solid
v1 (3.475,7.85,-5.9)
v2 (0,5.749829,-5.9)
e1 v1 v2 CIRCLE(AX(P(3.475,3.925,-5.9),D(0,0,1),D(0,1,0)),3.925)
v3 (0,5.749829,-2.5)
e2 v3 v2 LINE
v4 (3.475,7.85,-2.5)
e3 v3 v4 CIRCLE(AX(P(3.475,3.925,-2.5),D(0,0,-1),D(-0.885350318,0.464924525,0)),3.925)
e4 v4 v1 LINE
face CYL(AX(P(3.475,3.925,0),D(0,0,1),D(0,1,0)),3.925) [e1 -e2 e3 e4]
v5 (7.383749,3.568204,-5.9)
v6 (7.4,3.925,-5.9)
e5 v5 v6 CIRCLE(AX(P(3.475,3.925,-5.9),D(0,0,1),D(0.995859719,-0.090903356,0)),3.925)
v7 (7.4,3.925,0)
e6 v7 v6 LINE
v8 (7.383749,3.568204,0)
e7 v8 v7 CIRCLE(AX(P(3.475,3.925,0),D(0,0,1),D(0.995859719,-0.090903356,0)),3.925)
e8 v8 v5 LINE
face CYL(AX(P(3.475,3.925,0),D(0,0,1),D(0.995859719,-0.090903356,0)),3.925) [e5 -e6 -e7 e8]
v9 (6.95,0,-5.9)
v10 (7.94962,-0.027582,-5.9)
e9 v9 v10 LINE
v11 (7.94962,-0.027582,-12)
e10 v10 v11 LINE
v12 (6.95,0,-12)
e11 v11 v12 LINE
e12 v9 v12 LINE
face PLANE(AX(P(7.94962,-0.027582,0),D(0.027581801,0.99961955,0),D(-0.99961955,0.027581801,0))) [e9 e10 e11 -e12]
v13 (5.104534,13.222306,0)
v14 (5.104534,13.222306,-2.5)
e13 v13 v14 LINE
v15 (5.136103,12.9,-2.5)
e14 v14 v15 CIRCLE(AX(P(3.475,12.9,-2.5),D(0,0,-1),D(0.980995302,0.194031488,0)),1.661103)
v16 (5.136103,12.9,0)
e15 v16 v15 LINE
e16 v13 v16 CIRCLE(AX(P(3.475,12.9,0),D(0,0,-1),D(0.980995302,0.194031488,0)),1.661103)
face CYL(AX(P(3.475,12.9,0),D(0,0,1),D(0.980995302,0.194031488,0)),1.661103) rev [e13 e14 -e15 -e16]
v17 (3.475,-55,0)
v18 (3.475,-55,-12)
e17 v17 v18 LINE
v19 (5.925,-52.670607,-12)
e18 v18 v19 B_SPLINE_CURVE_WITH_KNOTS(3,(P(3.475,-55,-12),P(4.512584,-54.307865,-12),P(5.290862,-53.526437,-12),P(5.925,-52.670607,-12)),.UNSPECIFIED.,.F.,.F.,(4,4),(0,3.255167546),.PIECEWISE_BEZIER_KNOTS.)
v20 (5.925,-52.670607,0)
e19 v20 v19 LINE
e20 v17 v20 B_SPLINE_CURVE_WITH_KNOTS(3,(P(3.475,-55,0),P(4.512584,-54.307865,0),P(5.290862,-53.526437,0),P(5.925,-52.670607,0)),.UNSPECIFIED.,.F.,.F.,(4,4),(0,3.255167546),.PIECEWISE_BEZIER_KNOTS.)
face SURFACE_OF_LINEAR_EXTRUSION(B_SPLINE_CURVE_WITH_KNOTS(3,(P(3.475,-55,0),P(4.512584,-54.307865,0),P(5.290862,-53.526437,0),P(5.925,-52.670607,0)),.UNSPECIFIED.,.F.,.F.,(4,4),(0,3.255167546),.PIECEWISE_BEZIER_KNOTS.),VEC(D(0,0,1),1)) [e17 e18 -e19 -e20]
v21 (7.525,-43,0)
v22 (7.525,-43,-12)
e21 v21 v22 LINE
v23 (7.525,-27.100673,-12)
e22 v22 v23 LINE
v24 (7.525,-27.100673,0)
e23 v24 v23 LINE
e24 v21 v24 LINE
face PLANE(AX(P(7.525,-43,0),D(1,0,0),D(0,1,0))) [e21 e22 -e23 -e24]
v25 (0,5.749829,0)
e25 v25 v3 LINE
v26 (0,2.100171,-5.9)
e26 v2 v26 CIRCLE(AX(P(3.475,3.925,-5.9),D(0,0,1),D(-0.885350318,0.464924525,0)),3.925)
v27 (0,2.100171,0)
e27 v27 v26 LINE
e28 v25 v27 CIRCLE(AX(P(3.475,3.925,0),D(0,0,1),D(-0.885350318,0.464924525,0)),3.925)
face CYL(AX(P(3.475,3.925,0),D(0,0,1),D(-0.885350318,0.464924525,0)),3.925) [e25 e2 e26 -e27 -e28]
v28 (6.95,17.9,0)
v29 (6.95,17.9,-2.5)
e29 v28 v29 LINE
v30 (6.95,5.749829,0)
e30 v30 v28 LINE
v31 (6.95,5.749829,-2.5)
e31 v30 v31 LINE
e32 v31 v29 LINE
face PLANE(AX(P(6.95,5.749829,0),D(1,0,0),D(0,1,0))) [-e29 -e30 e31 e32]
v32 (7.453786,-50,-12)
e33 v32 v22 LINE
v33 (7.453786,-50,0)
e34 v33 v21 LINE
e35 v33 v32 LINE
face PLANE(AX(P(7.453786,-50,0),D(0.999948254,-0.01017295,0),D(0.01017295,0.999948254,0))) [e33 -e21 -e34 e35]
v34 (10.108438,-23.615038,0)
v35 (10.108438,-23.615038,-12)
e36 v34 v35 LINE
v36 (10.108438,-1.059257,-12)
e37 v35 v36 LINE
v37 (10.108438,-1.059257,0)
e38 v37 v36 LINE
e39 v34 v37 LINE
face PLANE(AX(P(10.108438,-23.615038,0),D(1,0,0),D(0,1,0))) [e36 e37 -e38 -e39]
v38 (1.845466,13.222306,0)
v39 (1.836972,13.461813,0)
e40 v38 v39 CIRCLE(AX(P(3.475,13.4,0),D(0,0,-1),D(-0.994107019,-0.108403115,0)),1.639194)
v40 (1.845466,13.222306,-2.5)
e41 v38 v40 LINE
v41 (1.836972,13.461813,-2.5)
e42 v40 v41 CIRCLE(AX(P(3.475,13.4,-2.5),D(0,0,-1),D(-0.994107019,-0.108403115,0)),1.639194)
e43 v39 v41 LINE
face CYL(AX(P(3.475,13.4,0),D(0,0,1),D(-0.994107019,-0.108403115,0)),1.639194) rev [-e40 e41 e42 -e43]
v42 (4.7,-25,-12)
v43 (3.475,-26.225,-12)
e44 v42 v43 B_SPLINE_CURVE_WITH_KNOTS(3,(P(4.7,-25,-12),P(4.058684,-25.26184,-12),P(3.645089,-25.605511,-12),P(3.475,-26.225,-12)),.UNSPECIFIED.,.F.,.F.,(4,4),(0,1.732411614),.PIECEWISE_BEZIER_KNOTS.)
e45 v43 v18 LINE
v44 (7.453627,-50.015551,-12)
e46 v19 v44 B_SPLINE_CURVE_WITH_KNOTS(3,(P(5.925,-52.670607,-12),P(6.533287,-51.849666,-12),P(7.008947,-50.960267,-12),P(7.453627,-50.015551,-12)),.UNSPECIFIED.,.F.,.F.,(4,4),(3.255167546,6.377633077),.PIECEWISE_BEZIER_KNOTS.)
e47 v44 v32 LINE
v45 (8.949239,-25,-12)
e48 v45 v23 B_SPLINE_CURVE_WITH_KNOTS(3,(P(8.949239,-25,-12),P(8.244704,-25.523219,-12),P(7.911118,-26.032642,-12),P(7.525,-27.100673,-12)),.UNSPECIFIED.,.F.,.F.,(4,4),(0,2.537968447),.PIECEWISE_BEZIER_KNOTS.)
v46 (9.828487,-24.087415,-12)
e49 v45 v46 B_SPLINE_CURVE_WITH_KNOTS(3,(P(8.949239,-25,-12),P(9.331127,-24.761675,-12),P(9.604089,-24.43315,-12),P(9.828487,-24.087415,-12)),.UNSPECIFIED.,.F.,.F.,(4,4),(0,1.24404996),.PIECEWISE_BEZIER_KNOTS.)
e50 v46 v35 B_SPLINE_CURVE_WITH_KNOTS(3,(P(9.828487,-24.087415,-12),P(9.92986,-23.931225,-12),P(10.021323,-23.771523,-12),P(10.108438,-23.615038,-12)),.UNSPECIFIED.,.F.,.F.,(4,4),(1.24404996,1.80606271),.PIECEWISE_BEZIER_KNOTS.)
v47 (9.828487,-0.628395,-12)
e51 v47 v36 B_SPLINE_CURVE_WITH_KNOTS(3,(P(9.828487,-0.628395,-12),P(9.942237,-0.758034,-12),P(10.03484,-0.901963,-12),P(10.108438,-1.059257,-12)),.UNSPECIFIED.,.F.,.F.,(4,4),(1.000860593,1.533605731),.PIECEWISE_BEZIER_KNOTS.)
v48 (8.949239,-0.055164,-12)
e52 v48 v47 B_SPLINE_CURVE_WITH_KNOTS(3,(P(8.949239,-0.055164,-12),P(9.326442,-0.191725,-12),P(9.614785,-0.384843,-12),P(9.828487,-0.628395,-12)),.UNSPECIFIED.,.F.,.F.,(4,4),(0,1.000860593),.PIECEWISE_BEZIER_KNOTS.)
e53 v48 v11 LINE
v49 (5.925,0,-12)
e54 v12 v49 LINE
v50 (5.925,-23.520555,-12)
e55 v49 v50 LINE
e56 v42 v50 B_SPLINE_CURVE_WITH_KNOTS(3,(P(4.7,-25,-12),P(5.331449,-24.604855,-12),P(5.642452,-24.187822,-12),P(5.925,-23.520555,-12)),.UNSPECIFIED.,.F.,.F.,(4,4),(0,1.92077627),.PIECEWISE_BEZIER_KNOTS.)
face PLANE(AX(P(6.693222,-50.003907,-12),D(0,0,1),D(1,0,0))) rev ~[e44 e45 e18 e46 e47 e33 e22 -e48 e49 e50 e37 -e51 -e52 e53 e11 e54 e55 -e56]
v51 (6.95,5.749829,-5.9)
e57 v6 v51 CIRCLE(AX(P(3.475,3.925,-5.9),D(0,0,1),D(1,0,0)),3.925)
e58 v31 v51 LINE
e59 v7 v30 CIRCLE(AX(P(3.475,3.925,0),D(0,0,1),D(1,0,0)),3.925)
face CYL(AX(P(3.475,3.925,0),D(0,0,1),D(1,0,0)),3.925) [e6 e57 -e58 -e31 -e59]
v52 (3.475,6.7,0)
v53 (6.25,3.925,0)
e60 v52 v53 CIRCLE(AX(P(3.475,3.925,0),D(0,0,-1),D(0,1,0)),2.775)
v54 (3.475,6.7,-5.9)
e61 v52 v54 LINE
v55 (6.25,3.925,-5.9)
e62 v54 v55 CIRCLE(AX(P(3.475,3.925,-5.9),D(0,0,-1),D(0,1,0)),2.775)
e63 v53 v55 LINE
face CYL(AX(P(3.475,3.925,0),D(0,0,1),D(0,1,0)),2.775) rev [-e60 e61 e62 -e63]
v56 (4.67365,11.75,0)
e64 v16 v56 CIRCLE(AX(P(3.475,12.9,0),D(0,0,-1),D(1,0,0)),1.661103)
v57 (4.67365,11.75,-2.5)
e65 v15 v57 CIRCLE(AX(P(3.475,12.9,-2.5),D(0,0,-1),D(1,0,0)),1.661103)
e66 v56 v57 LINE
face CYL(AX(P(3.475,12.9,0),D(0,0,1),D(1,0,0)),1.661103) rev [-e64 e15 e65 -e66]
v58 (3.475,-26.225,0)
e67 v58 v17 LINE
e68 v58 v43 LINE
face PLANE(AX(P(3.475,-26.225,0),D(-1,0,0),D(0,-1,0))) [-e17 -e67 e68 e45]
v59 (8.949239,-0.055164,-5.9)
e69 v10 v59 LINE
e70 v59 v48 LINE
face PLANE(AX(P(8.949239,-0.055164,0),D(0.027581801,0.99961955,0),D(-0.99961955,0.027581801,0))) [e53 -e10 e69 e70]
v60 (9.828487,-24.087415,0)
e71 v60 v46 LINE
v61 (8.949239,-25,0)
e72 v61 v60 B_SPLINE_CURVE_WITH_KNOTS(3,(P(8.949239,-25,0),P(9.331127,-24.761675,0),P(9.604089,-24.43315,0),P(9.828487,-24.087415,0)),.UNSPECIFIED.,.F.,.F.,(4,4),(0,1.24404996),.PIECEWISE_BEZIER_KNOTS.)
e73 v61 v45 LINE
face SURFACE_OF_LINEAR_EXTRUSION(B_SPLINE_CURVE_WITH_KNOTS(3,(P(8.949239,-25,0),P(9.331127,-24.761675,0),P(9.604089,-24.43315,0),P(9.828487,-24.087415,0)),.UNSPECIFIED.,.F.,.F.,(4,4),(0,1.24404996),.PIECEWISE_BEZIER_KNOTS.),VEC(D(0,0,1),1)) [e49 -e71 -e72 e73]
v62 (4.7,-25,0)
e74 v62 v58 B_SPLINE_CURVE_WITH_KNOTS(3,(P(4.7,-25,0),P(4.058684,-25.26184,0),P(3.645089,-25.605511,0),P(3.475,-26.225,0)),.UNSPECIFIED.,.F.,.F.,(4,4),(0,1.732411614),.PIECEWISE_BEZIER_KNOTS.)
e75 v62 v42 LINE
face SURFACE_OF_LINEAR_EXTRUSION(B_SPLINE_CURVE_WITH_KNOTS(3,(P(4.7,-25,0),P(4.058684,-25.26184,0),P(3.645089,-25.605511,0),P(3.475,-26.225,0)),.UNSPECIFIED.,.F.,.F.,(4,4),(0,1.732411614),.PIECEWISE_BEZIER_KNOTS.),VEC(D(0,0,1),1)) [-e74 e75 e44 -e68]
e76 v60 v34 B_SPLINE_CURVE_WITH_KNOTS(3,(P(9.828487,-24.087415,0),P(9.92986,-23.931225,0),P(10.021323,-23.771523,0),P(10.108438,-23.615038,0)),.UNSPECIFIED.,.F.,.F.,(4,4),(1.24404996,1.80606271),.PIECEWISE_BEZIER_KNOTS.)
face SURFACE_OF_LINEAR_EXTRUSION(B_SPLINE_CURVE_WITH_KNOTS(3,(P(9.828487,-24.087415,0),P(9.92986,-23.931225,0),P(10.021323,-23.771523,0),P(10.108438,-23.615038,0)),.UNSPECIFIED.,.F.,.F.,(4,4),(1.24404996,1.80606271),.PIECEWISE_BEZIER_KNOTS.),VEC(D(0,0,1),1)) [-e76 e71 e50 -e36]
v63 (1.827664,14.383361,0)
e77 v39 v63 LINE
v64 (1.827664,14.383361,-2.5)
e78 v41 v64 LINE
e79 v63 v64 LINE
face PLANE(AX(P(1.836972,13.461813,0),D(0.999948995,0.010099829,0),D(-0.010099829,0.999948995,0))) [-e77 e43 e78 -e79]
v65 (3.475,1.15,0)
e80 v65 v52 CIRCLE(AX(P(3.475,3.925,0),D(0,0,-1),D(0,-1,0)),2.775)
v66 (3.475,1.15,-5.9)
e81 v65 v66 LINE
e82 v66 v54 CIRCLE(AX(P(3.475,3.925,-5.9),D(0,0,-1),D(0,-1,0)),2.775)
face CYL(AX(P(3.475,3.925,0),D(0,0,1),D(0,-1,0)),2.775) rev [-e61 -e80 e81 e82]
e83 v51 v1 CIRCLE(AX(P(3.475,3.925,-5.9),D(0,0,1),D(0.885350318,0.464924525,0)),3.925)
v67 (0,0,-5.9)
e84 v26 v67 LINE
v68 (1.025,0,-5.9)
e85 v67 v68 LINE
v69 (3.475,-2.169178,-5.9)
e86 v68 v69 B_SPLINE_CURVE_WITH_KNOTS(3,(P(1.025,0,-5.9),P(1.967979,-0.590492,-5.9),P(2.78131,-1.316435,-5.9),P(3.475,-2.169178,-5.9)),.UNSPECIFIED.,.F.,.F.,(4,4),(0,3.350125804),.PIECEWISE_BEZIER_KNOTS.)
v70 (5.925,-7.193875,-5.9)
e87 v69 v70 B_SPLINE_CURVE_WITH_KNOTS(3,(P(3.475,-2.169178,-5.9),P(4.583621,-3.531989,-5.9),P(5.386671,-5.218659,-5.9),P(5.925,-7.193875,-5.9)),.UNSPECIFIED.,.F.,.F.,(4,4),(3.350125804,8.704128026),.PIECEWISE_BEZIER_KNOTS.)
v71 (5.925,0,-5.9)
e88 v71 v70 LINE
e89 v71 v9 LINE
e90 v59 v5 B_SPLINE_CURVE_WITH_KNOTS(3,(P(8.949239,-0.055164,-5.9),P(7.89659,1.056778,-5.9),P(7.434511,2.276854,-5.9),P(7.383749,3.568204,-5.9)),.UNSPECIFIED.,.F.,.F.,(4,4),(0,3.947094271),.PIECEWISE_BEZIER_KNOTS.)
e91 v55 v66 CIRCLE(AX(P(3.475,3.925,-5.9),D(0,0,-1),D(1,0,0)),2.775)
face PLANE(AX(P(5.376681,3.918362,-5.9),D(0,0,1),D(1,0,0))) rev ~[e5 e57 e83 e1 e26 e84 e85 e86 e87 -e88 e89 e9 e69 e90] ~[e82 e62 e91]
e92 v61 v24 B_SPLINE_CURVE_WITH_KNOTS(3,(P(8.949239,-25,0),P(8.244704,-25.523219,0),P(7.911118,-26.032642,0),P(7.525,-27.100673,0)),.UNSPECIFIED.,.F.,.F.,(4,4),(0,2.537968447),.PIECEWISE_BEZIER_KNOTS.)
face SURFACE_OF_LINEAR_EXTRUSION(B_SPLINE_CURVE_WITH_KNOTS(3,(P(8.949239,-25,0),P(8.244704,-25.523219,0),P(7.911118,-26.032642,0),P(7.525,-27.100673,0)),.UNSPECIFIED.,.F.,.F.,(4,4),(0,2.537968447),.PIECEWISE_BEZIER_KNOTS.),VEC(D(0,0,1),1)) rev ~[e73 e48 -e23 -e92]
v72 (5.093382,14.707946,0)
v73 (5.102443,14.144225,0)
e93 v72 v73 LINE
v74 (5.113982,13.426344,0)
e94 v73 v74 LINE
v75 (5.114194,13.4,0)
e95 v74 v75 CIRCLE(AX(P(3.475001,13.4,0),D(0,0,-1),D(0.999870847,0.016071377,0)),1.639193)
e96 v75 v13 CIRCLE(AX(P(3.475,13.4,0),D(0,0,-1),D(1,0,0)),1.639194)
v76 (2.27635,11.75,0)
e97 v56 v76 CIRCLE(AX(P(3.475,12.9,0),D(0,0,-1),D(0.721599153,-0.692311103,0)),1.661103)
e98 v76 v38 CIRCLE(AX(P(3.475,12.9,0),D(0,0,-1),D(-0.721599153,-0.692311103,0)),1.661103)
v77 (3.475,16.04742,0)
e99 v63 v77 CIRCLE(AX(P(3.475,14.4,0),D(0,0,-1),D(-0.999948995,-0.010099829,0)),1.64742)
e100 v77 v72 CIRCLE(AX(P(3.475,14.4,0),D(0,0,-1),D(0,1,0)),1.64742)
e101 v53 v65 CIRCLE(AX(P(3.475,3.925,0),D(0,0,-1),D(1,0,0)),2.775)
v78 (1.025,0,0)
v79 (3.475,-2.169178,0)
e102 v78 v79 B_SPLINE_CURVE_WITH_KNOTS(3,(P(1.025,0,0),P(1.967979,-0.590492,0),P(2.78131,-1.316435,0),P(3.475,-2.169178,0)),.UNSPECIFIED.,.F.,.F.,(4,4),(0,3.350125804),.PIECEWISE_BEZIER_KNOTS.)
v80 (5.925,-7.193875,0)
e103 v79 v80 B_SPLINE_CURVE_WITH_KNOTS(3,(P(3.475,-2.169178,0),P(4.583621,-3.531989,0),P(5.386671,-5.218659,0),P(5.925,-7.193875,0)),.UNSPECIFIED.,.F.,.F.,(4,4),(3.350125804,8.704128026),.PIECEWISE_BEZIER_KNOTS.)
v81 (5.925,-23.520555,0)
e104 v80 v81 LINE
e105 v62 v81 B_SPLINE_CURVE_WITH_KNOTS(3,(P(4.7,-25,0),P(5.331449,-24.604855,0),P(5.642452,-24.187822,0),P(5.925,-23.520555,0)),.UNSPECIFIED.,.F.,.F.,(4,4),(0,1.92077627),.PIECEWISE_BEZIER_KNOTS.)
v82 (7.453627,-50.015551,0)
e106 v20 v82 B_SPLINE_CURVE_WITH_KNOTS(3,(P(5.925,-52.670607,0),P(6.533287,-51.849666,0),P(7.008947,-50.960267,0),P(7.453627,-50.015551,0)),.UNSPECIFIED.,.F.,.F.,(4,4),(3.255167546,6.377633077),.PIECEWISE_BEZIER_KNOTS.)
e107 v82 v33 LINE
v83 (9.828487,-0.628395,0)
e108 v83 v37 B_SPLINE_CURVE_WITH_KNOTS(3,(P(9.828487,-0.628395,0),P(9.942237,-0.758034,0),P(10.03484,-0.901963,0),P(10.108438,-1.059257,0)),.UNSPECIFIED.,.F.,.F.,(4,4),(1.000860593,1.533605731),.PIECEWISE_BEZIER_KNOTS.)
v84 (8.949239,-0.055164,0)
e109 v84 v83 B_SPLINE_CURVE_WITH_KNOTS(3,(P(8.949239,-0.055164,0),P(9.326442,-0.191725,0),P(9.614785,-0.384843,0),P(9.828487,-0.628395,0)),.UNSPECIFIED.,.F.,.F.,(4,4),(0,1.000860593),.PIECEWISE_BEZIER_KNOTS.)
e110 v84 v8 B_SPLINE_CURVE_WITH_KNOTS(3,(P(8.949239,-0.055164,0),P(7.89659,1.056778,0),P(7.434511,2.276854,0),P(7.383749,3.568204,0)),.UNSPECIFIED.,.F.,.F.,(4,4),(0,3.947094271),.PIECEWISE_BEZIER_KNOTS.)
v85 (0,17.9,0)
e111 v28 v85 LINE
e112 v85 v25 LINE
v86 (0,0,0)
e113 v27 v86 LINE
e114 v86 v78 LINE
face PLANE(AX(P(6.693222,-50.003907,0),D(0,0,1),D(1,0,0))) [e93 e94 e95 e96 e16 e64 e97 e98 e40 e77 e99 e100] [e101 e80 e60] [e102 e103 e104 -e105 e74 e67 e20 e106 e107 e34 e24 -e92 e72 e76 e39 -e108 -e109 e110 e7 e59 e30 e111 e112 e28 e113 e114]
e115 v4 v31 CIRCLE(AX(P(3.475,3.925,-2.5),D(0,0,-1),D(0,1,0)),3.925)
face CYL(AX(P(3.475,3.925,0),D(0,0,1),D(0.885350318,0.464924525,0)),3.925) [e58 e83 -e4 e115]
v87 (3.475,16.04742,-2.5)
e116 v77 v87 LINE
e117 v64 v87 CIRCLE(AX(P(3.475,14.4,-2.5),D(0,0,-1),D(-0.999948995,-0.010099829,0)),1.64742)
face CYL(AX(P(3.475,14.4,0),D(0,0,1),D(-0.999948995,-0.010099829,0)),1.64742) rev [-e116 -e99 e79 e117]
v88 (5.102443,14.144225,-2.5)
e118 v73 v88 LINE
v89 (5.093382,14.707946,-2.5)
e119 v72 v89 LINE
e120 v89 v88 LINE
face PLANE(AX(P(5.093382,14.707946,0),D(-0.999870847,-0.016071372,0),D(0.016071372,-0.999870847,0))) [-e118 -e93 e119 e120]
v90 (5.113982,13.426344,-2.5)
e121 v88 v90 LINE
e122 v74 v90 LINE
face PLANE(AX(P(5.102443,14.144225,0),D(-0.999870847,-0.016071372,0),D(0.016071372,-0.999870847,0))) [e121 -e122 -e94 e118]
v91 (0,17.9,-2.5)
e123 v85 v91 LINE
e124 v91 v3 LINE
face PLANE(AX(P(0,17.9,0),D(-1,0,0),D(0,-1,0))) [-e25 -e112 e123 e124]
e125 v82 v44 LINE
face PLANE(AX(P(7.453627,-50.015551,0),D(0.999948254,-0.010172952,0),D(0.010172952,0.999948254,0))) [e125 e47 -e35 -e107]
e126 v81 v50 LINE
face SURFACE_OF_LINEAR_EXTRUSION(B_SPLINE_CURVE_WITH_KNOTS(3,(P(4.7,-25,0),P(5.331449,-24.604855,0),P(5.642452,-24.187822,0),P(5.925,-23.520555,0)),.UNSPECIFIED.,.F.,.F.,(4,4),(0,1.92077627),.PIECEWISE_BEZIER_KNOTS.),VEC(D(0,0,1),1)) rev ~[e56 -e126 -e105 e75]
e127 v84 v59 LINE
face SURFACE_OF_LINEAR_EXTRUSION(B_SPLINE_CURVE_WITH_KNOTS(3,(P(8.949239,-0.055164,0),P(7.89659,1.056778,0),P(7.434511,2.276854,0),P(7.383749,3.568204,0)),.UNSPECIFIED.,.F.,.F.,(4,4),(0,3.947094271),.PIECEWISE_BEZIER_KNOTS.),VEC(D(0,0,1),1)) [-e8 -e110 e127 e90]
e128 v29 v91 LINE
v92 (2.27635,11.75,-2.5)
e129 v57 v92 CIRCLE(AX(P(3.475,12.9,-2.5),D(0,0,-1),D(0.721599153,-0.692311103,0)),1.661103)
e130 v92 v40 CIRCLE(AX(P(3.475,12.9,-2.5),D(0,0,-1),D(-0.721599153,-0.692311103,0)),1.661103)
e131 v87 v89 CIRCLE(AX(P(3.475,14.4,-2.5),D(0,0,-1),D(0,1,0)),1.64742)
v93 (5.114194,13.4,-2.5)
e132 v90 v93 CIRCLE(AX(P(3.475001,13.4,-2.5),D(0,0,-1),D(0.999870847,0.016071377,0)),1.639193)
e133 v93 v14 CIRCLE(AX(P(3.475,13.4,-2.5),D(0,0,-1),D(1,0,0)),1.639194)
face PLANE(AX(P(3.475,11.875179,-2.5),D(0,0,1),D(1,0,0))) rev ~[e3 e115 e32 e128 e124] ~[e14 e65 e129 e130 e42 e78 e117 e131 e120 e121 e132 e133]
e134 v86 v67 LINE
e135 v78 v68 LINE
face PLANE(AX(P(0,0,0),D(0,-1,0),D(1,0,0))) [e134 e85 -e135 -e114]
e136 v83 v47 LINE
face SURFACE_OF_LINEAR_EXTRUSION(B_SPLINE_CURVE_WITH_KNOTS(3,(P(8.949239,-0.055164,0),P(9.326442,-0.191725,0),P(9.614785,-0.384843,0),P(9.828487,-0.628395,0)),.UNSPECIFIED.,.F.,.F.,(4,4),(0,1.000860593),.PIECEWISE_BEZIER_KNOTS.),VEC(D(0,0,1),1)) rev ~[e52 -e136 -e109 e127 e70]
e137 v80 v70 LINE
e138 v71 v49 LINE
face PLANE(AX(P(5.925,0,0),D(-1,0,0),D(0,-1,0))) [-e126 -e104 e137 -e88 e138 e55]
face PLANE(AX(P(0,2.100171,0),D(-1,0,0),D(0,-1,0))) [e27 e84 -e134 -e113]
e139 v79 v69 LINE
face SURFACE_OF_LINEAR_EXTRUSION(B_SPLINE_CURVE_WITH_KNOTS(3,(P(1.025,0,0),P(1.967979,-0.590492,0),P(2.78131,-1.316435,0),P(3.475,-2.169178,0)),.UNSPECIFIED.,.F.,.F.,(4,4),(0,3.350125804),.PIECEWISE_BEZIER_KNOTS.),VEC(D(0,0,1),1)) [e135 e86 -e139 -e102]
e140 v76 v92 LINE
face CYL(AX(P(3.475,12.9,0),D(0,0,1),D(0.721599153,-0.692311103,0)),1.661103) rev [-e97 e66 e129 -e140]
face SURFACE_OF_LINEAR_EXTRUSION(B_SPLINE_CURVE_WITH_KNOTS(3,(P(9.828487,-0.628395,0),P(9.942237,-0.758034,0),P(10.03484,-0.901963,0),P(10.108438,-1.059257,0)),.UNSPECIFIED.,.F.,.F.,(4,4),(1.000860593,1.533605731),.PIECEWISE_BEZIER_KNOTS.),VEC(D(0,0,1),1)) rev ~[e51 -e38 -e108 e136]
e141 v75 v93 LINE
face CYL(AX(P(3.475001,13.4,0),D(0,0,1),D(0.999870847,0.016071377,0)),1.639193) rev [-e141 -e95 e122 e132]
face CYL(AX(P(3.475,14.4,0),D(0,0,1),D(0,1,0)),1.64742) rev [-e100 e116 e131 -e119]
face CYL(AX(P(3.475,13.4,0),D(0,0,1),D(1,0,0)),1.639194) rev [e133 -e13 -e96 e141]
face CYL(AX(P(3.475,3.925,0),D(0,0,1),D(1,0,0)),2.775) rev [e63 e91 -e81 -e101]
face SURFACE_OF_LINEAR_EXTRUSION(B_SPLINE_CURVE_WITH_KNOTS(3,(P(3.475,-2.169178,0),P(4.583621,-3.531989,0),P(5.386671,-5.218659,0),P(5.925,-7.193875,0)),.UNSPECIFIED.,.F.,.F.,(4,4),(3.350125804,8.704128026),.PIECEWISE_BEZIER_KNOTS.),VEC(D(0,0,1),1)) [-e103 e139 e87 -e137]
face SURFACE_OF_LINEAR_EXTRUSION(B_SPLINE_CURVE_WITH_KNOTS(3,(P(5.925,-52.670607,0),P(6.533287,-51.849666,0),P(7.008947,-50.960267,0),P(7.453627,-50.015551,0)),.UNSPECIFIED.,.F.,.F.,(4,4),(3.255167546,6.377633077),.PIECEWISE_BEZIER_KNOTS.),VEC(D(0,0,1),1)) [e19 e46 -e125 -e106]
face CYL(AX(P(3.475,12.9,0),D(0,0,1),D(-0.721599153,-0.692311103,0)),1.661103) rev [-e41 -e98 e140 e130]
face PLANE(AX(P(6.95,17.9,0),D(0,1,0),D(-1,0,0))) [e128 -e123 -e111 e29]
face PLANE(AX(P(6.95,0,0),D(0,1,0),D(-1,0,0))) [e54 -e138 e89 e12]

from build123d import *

# Parameters (mm, degrees)
F1_DEPTH = 5.9
F2_DEPTH = 2.5
F3_DEPTH = 5.9
F4_DEPTH = 12
F5_DEPTH = 12


with BuildPart() as f1:
    # F0 (on Top) → F1 (new body)
    with BuildSketch(Plane.XY):
        with BuildLine():
            Line((3.475, 1.15), (3.475, 0))
            ThreePointArc((3.475, 0), (4.7730375063, 0.2208504846), (5.925, 0.8585484677))
            ThreePointArc((5.925, 0.8585484677), (6.5018486959, 1.426237912), (6.95, 2.1001712409))
            Line((6.95, 2.1001712409), (6.95, 5.7498287591))
            ThreePointArc((6.95, 5.7498287591), (5.5051689733, 7.2841723593), (3.475, 7.85))
            Line((3.475, 7.85), (3.475, 6.8908035755))
            Line((3.475, 6.8908035755), (3.475, 6.7))
            ThreePointArc((3.475, 6.7), (5.4372213178, 5.8872213178), (6.25, 3.925))
            ThreePointArc((6.25, 3.925), (5.4372213178, 1.9627786822), (3.475, 1.15))
        make_face()
        with BuildLine():
            Line((6.95, 5.7498287591), (6.95, 2.1001712409))
            ThreePointArc((6.95, 2.1001712409), (7.2391359007, 2.8128372775), (7.3837493972, 3.5682043308))
            ThreePointArc((7.3837493972, 3.5682043308), (7.3959352446, 3.7464172239), (7.4, 3.925))
            ThreePointArc((7.4, 3.925), (7.2858398025, 4.8647473065), (6.95, 5.7498287591))
        make_face()
        with BuildLine():
            Line((0, 5.7498287591), (0, 2.1001712409))
            ThreePointArc((0, 2.1001712409), (0.4481513041, 1.426237912), (1.025, 0.8585484677))
            ThreePointArc((1.025, 0.8585484677), (2.1769624937, 0.2208504846), (3.475, 0))
            Line((3.475, 0), (3.475, 1.15))
            ThreePointArc((3.475, 1.15), (0.7, 3.925), (3.475, 6.7))
            Line((3.475, 6.7), (3.475, 6.8908035755))
            Line((3.475, 6.8908035755), (3.475, 7.85))
            ThreePointArc((3.475, 7.85), (1.4448310267, 7.2841723593), (0, 5.7498287591))
        make_face()
        with BuildLine():
            ThreePointArc((0, 5.7498287591), (-0.45, 3.925), (0, 2.1001712409))
            Line((0, 2.1001712409), (0, 5.7498287591))
        make_face()
        with BuildLine():
            ThreePointArc((6.95, 2.1001712409), (6.5018486959, 1.426237912), (5.925, 0.8585484677))
            Line((5.925, 0.8585484677), (5.925, 0))
            Line((5.925, 0), (6.95, 0))
            Line((6.95, 0), (6.95, 0.75))
            Line((6.95, 0.75), (6.95, 1.44))
            Line((6.95, 1.44), (6.95, 1.5))
            Line((6.95, 1.5), (6.95, 2.1001712409))
        make_face()
        with BuildLine():
            Line((0, 2.1001712409), (0, 0))
            Line((0, 0), (1.025, 0))
            Line((1.025, 0), (1.025, 0.8585484677))
            ThreePointArc((1.025, 0.8585484677), (0.4481513041, 1.426237912), (0, 2.1001712409))
        make_face()
        with BuildLine():
            Line((1.025, 0.8585484677), (1.025, 0))
            Line((1.025, 0), (3.475, 0))
            ThreePointArc((3.475, 0), (2.1769624937, 0.2208504846), (1.025, 0.8585484677))
        make_face()
        with BuildLine():
            ThreePointArc((5.925, 0.8585484677), (4.7730375063, 0.2208504846), (3.475, 0))
            Line((3.475, 0), (4.7, 0))
            Line((4.7, 0), (5.925, 0))
            Line((5.925, 0), (5.925, 0.8585484677))
        make_face()
        with BuildLine():
            Line((5.925, 0), (4.7, 0))
            add(Edge.make_bspline(
                [(4.7, 0), (5.2537494339, -0.3164176305), (5.6369397789, -0.7196032093), (5.925, -1.225)],
                knots=[0, 0, 0, 0, 1.7324116139, 1.7324116139, 1.7324116139, 1.7324116139], degree=3))
            Line((5.925, -1.225), (5.925, -0.079424061))
            Line((5.925, -0.079424061), (5.925, 0))
        make_face()
        with BuildLine():
            Line((6.95, 0.75), (6.95, 0))
            Line((6.95, 0), (7.9496195498, -0.0275818011))
            add(Edge.make_bspline(
                [(7.9496195498, -0.0275818011), (7.5186002068, 0.1973926119), (7.1600275114, 0.4521599913), (6.95, 0.75)],
                knots=[0, 0, 0, 0, 1.2664409586, 1.2664409586, 1.2664409586, 1.2664409586], degree=3))
        make_face()
    extrude(amount=-F1_DEPTH)

    # F0 (on Top) → F2 (join)
    with BuildSketch(Plane.XY):
        with BuildLine():
            Line((0, 7.85), (0, 5.7498287591))
            ThreePointArc((0, 5.7498287591), (1.4448310267, 7.2841723593), (3.475, 7.85))
            ThreePointArc((3.475, 7.85), (5.5051689733, 7.2841723593), (6.95, 5.7498287591))
            Line((6.95, 5.7498287591), (6.95, 17.9))
            Line((6.95, 17.9), (3.475, 17.9))
            Line((3.475, 17.9), (0, 17.9))
            Line((0, 17.9), (0, 7.85))
        make_face()
        with BuildLine():
            ThreePointArc((1.8276640256, 14.3833613398), (2.3042302705, 15.55900427), (3.475, 16.0474200003))
            ThreePointArc((3.475, 16.0474200003), (4.5253988967, 15.6691157612), (5.0933824344, 14.7079463483))
            Line((5.0933824344, 14.7079463483), (5.1024433757, 14.1442252627))
            Line((5.1024433757, 14.1442252627), (5.113982201, 13.4263440945))
            ThreePointArc((5.113982201, 13.4263440945), (5.1141409801, 13.4131724726), (5.1141939076, 13.4))
            ThreePointArc((5.1141939076, 13.4), (5.1117771913, 13.3110219533), (5.1045341684, 13.222306273))
            ThreePointArc((5.1045341684, 13.222306273), (5.1281919004, 13.0619243035), (5.1361029286, 12.9))
            ThreePointArc((5.1361029286, 12.9), (5.0161594238, 12.2802495905), (4.673650466, 11.75))
            ThreePointArc((4.673650466, 11.75), (3.475, 11.2388970714), (2.276349534, 11.75))
            ThreePointArc((2.276349534, 11.75), (1.8807671055, 12.4334333727), (1.8454658316, 13.222306273))
            ThreePointArc((1.8454658316, 13.222306273), (1.8368359194, 13.3419042896), (1.8369719791, 13.4618131819))
            Line((1.8369719791, 13.4618131819), (1.8276640256, 14.3833613398))
        make_face(mode=Mode.SUBTRACT)
    extrude(amount=-F2_DEPTH)

    # F0 (on Top) → F3 (join)
    with BuildSketch(Plane.XY):
        with BuildLine():
            Line((6.95, 5.7498287591), (6.95, 2.1001712409))
            ThreePointArc((6.95, 2.1001712409), (7.2391359007, 2.8128372775), (7.3837493972, 3.5682043308))
            ThreePointArc((7.3837493972, 3.5682043308), (7.3959352446, 3.7464172239), (7.4, 3.925))
            ThreePointArc((7.4, 3.925), (7.2858398025, 4.8647473065), (6.95, 5.7498287591))
        make_face()
        with BuildLine():
            Line((6.95, 0.75), (6.95, 0))
            Line((6.95, 0), (7.9496195498, -0.0275818011))
            add(Edge.make_bspline(
                [(7.9496195498, -0.0275818011), (7.5186002068, 0.1973926119), (7.1600275114, 0.4521599913), (6.95, 0.75)],
                knots=[0, 0, 0, 0, 1.2664409586, 1.2664409586, 1.2664409586, 1.2664409586], degree=3))
        make_face()
        with BuildLine():
            ThreePointArc((7.3837493972, 3.5682043308), (7.2391359007, 2.8128372775), (6.95, 2.1001712409))
            Line((6.95, 2.1001712409), (6.95, 1.5))
            Line((6.95, 1.5), (6.95, 1.44))
            Line((6.95, 1.44), (6.95, 0.75))
            add(Edge.make_bspline(
                [(7.9496195498, -0.0275818011), (7.5186002068, 0.1973926119), (7.1600275114, 0.4521599913), (6.95, 0.75)],
                knots=[0, 0, 0, 0, 1.2664409586, 1.2664409586, 1.2664409586, 1.2664409586], degree=3))
            Line((7.9496195498, -0.0275818011), (8.9492390995, -0.0551636022))
            add(Edge.make_bspline(
                [(8.9492390995, -0.0551636022), (7.8965900466, 1.0567778954), (7.4345106259, 2.2768541239), (7.3837493972, 3.5682043308)],
                knots=[0, 0, 0, 0, 3.9470942713, 3.9470942713, 3.9470942713, 3.9470942713], degree=3))
        make_face()
        with BuildLine():
            Line((3.475, 0), (1.025, 0))
            add(Edge.make_bspline(
                [(1.025, 0), (1.9679788021, -0.5904915447), (2.7813095381, -1.3164345806), (3.475, -2.169177953)],
                knots=[0, 0, 0, 0, 3.3501258039, 3.3501258039, 3.3501258039, 3.3501258039], degree=3))
            Line((3.475, -2.169177953), (3.475, -1.225))
            Line((3.475, -1.225), (3.475, 0))
        make_face()
        with BuildLine():
            Line((4.7, 0), (3.475, 0))
            Line((3.475, 0), (3.475, -1.225))
            Line((3.475, -1.225), (3.475, -2.169177953))
            add(Edge.make_bspline(
                [(3.475, -2.169177953), (4.583621136, -3.5319894349), (5.386671183, -5.2186593933), (5.925, -7.1938754991)],
                knots=[3.3501258039, 3.3501258039, 3.3501258039, 3.3501258039, 8.7041280262, 8.7041280262, 8.7041280262, 8.7041280262], degree=3))
            Line((5.925, -7.1938754991), (5.925, -1.225))
            add(Edge.make_bspline(
                [(4.7, 0), (5.2537494339, -0.3164176305), (5.6369397789, -0.7196032093), (5.925, -1.225)],
                knots=[0, 0, 0, 0, 1.7324116139, 1.7324116139, 1.7324116139, 1.7324116139], degree=3))
        make_face()
    extrude(amount=-F3_DEPTH)

    # F0 (on Top) → F4 (join)
    with BuildSketch(Plane.XY):
        with BuildLine():
            Line((5.925, -1.225), (5.925, -7.1938754991))
            Line((5.925, -7.1938754991), (5.925, -21.3844068348))
            Line((5.925, -21.3844068348), (5.925, -22.55))
            Line((5.925, -22.55), (5.925, -22.9875))
            Line((5.925, -22.9875), (5.925, -23.5205553472))
            Line((5.925, -23.5205553472), (5.925, -25))
            Line((5.925, -25), (7.525, -25))
            Line((7.525, -25), (8.9492390995, -25))
            Line((8.9492390995, -25), (8.9492390995, -0.9913714603))
            add(Edge.make_bspline(
                [(7.9496195498, -0.0275818011), (8.4295123816, -0.2455351059), (8.7658986449, -0.6068330258), (8.9492390995, -0.9913714603)],
                knots=[0, 0, 0, 0, 1.3885711186, 1.3885711186, 1.3885711186, 1.3885711186], degree=3))
            Line((7.9496195498, -0.0275818011), (6.95, 0))
            Line((6.95, 0), (5.925, 0))
            Line((5.925, 0), (5.925, -0.079424061))
            Line((5.925, -0.079424061), (5.925, -1.225))
        make_face()
        with BuildLine():
            add(Edge.make_bspline(
                [(4.7, -25), (4.0586842224, -25.2618398517), (3.6450892221, -25.6055109203), (3.475, -26.225)],
                knots=[0, 0, 0, 0, 1.7324116139, 1.7324116139, 1.7324116139, 1.7324116139], degree=3))
            Line((3.475, -26.225), (3.475, -48.775))
            Line((3.475, -48.775), (3.475, -50))
            Line((3.475, -50), (5.925, -50))
            Line((5.925, -50), (5.925, -47.55))
            Line((5.925, -47.55), (5.925, -43))
            Line((5.925, -43), (5.925, -28.903))
            Line((5.925, -28.903), (5.925, -26.9515))
            Line((5.925, -26.9515), (5.925, -25))
            Line((5.925, -25), (4.7, -25))
        make_face()
        with BuildLine():
            add(Edge.make_bspline(
                [(4.7, -25), (5.3314492106, -24.6048551053), (5.6424522772, -24.1878218949), (5.925, -23.5205553472)],
                knots=[0, 0, 0, 0, 1.9207762703, 1.9207762703, 1.9207762703, 1.9207762703], degree=3))
            Line((4.7, -25), (5.925, -25))
            Line((5.925, -25), (5.925, -23.5205553472))
        make_face()
        with BuildLine():
            Line((8.9492390995, -0.0551636022), (7.9496195498, -0.0275818011))
            add(Edge.make_bspline(
                [(7.9496195498, -0.0275818011), (8.4295123816, -0.2455351059), (8.7658986449, -0.6068330258), (8.9492390995, -0.9913714603)],
                knots=[0, 0, 0, 0, 1.3885711186, 1.3885711186, 1.3885711186, 1.3885711186], degree=3))
            Line((8.9492390995, -0.9913714603), (8.9492390995, -0.0551636022))
        make_face()
        with BuildLine():
            add(Edge.make_bspline(
                [(8.9492390995, -0.0551636022), (9.326442021, -0.1917248564), (9.6147849957, -0.3848434336), (9.8284865708, -0.6283950562)],
                knots=[0, 0, 0, 0, 1.0008605929, 1.0008605929, 1.0008605929, 1.0008605929], degree=3))
            Line((8.9492390995, -0.0551636022), (8.9492390995, -0.9913714603))
            Line((8.9492390995, -0.9913714603), (8.9492390995, -25))
            add(Edge.make_bspline(
                [(8.9492390995, -25), (9.331126801, -24.7616745123), (9.6040893739, -24.433150219), (9.8284865708, -24.0874149632)],
                knots=[0, 0, 0, 0, 1.2440499597, 1.2440499597, 1.2440499597, 1.2440499597], degree=3))
            Line((9.8284865708, -24.0874149632), (9.8284865708, -0.6283950562))
        make_face()
        Polygon((7.525, -25), (5.925, -25), (5.925, -26.9515), (5.925, -28.903), (5.925, -43), (7.525, -43), (7.525, -27.1006729454), align=None)
        with BuildLine():
            add(Edge.make_bspline(
                [(9.8284865708, -0.6283950562), (9.942237153, -0.7580344322), (10.0348396241, -0.9019629784), (10.1084383205, -1.0592570761)],
                knots=[1.0008605929, 1.0008605929, 1.0008605929, 1.0008605929, 1.533605731, 1.533605731, 1.533605731, 1.533605731], degree=3))
            Line((9.8284865708, -0.6283950562), (9.8284865708, -24.0874149632))
            add(Edge.make_bspline(
                [(9.8284865708, -24.0874149632), (9.9298603822, -23.9312253982), (10.0213226008, -23.7715232886), (10.1084383205, -23.6150380224)],
                knots=[1.2440499597, 1.2440499597, 1.2440499597, 1.2440499597, 1.8060627102, 1.8060627102, 1.8060627102, 1.8060627102], degree=3))
            Line((10.1084383205, -23.6150380224), (10.1084383205, -1.0592570761))
        make_face()
        with BuildLine():
            Line((5.925, -50), (3.475, -50))
            Line((3.475, -50), (3.475, -55))
            add(Edge.make_bspline(
                [(3.475, -55), (4.512583722, -54.3078648135), (5.2908616095, -53.5264365704), (5.925, -52.6706067544)],
                knots=[0, 0, 0, 0, 3.2551675464, 3.2551675464, 3.2551675464, 3.2551675464], degree=3))
            Line((5.925, -52.6706067544), (5.925, -52.0125))
            Line((5.925, -52.0125), (5.925, -50))
        make_face()
        with BuildLine():
            Line((8.9492390995, -25), (7.525, -25))
            Line((7.525, -25), (7.525, -27.1006729454))
            add(Edge.make_bspline(
                [(8.9492390995, -25), (8.2447035238, -25.5232192576), (7.9111177474, -26.03264153), (7.525, -27.1006729454)],
                knots=[0, 0, 0, 0, 2.5379684466, 2.5379684466, 2.5379684466, 2.5379684466], degree=3))
        make_face()
        with BuildLine():
            Line((7.4536274492, -50.0155514561), (5.925, -50))
            Line((5.925, -50), (5.925, -52.0125))
            Line((5.925, -52.0125), (5.925, -52.6706067544))
            add(Edge.make_bspline(
                [(5.925, -52.6706067544), (6.5332867434, -51.8496661845), (7.0089465882, -50.9602665865), (7.4536274492, -50.0155514561)],
                knots=[3.2551675464, 3.2551675464, 3.2551675464, 3.2551675464, 6.3776330772, 6.3776330772, 6.3776330772, 6.3776330772], degree=3))
        make_face()
        Polygon((5.925, -47.55), (5.925, -50), (7.4537856616, -50), (7.525, -43), (5.925, -43), align=None)
    extrude(amount=-F4_DEPTH)

    # F0 (on Top) → F5 (join)
    with BuildSketch(Plane.XY):
        Polygon((7.4537856616, -50), (5.925, -50), (7.4536274492, -50.0155514561), align=None)
    extrude(amount=-F5_DEPTH)


solid = f1.part
